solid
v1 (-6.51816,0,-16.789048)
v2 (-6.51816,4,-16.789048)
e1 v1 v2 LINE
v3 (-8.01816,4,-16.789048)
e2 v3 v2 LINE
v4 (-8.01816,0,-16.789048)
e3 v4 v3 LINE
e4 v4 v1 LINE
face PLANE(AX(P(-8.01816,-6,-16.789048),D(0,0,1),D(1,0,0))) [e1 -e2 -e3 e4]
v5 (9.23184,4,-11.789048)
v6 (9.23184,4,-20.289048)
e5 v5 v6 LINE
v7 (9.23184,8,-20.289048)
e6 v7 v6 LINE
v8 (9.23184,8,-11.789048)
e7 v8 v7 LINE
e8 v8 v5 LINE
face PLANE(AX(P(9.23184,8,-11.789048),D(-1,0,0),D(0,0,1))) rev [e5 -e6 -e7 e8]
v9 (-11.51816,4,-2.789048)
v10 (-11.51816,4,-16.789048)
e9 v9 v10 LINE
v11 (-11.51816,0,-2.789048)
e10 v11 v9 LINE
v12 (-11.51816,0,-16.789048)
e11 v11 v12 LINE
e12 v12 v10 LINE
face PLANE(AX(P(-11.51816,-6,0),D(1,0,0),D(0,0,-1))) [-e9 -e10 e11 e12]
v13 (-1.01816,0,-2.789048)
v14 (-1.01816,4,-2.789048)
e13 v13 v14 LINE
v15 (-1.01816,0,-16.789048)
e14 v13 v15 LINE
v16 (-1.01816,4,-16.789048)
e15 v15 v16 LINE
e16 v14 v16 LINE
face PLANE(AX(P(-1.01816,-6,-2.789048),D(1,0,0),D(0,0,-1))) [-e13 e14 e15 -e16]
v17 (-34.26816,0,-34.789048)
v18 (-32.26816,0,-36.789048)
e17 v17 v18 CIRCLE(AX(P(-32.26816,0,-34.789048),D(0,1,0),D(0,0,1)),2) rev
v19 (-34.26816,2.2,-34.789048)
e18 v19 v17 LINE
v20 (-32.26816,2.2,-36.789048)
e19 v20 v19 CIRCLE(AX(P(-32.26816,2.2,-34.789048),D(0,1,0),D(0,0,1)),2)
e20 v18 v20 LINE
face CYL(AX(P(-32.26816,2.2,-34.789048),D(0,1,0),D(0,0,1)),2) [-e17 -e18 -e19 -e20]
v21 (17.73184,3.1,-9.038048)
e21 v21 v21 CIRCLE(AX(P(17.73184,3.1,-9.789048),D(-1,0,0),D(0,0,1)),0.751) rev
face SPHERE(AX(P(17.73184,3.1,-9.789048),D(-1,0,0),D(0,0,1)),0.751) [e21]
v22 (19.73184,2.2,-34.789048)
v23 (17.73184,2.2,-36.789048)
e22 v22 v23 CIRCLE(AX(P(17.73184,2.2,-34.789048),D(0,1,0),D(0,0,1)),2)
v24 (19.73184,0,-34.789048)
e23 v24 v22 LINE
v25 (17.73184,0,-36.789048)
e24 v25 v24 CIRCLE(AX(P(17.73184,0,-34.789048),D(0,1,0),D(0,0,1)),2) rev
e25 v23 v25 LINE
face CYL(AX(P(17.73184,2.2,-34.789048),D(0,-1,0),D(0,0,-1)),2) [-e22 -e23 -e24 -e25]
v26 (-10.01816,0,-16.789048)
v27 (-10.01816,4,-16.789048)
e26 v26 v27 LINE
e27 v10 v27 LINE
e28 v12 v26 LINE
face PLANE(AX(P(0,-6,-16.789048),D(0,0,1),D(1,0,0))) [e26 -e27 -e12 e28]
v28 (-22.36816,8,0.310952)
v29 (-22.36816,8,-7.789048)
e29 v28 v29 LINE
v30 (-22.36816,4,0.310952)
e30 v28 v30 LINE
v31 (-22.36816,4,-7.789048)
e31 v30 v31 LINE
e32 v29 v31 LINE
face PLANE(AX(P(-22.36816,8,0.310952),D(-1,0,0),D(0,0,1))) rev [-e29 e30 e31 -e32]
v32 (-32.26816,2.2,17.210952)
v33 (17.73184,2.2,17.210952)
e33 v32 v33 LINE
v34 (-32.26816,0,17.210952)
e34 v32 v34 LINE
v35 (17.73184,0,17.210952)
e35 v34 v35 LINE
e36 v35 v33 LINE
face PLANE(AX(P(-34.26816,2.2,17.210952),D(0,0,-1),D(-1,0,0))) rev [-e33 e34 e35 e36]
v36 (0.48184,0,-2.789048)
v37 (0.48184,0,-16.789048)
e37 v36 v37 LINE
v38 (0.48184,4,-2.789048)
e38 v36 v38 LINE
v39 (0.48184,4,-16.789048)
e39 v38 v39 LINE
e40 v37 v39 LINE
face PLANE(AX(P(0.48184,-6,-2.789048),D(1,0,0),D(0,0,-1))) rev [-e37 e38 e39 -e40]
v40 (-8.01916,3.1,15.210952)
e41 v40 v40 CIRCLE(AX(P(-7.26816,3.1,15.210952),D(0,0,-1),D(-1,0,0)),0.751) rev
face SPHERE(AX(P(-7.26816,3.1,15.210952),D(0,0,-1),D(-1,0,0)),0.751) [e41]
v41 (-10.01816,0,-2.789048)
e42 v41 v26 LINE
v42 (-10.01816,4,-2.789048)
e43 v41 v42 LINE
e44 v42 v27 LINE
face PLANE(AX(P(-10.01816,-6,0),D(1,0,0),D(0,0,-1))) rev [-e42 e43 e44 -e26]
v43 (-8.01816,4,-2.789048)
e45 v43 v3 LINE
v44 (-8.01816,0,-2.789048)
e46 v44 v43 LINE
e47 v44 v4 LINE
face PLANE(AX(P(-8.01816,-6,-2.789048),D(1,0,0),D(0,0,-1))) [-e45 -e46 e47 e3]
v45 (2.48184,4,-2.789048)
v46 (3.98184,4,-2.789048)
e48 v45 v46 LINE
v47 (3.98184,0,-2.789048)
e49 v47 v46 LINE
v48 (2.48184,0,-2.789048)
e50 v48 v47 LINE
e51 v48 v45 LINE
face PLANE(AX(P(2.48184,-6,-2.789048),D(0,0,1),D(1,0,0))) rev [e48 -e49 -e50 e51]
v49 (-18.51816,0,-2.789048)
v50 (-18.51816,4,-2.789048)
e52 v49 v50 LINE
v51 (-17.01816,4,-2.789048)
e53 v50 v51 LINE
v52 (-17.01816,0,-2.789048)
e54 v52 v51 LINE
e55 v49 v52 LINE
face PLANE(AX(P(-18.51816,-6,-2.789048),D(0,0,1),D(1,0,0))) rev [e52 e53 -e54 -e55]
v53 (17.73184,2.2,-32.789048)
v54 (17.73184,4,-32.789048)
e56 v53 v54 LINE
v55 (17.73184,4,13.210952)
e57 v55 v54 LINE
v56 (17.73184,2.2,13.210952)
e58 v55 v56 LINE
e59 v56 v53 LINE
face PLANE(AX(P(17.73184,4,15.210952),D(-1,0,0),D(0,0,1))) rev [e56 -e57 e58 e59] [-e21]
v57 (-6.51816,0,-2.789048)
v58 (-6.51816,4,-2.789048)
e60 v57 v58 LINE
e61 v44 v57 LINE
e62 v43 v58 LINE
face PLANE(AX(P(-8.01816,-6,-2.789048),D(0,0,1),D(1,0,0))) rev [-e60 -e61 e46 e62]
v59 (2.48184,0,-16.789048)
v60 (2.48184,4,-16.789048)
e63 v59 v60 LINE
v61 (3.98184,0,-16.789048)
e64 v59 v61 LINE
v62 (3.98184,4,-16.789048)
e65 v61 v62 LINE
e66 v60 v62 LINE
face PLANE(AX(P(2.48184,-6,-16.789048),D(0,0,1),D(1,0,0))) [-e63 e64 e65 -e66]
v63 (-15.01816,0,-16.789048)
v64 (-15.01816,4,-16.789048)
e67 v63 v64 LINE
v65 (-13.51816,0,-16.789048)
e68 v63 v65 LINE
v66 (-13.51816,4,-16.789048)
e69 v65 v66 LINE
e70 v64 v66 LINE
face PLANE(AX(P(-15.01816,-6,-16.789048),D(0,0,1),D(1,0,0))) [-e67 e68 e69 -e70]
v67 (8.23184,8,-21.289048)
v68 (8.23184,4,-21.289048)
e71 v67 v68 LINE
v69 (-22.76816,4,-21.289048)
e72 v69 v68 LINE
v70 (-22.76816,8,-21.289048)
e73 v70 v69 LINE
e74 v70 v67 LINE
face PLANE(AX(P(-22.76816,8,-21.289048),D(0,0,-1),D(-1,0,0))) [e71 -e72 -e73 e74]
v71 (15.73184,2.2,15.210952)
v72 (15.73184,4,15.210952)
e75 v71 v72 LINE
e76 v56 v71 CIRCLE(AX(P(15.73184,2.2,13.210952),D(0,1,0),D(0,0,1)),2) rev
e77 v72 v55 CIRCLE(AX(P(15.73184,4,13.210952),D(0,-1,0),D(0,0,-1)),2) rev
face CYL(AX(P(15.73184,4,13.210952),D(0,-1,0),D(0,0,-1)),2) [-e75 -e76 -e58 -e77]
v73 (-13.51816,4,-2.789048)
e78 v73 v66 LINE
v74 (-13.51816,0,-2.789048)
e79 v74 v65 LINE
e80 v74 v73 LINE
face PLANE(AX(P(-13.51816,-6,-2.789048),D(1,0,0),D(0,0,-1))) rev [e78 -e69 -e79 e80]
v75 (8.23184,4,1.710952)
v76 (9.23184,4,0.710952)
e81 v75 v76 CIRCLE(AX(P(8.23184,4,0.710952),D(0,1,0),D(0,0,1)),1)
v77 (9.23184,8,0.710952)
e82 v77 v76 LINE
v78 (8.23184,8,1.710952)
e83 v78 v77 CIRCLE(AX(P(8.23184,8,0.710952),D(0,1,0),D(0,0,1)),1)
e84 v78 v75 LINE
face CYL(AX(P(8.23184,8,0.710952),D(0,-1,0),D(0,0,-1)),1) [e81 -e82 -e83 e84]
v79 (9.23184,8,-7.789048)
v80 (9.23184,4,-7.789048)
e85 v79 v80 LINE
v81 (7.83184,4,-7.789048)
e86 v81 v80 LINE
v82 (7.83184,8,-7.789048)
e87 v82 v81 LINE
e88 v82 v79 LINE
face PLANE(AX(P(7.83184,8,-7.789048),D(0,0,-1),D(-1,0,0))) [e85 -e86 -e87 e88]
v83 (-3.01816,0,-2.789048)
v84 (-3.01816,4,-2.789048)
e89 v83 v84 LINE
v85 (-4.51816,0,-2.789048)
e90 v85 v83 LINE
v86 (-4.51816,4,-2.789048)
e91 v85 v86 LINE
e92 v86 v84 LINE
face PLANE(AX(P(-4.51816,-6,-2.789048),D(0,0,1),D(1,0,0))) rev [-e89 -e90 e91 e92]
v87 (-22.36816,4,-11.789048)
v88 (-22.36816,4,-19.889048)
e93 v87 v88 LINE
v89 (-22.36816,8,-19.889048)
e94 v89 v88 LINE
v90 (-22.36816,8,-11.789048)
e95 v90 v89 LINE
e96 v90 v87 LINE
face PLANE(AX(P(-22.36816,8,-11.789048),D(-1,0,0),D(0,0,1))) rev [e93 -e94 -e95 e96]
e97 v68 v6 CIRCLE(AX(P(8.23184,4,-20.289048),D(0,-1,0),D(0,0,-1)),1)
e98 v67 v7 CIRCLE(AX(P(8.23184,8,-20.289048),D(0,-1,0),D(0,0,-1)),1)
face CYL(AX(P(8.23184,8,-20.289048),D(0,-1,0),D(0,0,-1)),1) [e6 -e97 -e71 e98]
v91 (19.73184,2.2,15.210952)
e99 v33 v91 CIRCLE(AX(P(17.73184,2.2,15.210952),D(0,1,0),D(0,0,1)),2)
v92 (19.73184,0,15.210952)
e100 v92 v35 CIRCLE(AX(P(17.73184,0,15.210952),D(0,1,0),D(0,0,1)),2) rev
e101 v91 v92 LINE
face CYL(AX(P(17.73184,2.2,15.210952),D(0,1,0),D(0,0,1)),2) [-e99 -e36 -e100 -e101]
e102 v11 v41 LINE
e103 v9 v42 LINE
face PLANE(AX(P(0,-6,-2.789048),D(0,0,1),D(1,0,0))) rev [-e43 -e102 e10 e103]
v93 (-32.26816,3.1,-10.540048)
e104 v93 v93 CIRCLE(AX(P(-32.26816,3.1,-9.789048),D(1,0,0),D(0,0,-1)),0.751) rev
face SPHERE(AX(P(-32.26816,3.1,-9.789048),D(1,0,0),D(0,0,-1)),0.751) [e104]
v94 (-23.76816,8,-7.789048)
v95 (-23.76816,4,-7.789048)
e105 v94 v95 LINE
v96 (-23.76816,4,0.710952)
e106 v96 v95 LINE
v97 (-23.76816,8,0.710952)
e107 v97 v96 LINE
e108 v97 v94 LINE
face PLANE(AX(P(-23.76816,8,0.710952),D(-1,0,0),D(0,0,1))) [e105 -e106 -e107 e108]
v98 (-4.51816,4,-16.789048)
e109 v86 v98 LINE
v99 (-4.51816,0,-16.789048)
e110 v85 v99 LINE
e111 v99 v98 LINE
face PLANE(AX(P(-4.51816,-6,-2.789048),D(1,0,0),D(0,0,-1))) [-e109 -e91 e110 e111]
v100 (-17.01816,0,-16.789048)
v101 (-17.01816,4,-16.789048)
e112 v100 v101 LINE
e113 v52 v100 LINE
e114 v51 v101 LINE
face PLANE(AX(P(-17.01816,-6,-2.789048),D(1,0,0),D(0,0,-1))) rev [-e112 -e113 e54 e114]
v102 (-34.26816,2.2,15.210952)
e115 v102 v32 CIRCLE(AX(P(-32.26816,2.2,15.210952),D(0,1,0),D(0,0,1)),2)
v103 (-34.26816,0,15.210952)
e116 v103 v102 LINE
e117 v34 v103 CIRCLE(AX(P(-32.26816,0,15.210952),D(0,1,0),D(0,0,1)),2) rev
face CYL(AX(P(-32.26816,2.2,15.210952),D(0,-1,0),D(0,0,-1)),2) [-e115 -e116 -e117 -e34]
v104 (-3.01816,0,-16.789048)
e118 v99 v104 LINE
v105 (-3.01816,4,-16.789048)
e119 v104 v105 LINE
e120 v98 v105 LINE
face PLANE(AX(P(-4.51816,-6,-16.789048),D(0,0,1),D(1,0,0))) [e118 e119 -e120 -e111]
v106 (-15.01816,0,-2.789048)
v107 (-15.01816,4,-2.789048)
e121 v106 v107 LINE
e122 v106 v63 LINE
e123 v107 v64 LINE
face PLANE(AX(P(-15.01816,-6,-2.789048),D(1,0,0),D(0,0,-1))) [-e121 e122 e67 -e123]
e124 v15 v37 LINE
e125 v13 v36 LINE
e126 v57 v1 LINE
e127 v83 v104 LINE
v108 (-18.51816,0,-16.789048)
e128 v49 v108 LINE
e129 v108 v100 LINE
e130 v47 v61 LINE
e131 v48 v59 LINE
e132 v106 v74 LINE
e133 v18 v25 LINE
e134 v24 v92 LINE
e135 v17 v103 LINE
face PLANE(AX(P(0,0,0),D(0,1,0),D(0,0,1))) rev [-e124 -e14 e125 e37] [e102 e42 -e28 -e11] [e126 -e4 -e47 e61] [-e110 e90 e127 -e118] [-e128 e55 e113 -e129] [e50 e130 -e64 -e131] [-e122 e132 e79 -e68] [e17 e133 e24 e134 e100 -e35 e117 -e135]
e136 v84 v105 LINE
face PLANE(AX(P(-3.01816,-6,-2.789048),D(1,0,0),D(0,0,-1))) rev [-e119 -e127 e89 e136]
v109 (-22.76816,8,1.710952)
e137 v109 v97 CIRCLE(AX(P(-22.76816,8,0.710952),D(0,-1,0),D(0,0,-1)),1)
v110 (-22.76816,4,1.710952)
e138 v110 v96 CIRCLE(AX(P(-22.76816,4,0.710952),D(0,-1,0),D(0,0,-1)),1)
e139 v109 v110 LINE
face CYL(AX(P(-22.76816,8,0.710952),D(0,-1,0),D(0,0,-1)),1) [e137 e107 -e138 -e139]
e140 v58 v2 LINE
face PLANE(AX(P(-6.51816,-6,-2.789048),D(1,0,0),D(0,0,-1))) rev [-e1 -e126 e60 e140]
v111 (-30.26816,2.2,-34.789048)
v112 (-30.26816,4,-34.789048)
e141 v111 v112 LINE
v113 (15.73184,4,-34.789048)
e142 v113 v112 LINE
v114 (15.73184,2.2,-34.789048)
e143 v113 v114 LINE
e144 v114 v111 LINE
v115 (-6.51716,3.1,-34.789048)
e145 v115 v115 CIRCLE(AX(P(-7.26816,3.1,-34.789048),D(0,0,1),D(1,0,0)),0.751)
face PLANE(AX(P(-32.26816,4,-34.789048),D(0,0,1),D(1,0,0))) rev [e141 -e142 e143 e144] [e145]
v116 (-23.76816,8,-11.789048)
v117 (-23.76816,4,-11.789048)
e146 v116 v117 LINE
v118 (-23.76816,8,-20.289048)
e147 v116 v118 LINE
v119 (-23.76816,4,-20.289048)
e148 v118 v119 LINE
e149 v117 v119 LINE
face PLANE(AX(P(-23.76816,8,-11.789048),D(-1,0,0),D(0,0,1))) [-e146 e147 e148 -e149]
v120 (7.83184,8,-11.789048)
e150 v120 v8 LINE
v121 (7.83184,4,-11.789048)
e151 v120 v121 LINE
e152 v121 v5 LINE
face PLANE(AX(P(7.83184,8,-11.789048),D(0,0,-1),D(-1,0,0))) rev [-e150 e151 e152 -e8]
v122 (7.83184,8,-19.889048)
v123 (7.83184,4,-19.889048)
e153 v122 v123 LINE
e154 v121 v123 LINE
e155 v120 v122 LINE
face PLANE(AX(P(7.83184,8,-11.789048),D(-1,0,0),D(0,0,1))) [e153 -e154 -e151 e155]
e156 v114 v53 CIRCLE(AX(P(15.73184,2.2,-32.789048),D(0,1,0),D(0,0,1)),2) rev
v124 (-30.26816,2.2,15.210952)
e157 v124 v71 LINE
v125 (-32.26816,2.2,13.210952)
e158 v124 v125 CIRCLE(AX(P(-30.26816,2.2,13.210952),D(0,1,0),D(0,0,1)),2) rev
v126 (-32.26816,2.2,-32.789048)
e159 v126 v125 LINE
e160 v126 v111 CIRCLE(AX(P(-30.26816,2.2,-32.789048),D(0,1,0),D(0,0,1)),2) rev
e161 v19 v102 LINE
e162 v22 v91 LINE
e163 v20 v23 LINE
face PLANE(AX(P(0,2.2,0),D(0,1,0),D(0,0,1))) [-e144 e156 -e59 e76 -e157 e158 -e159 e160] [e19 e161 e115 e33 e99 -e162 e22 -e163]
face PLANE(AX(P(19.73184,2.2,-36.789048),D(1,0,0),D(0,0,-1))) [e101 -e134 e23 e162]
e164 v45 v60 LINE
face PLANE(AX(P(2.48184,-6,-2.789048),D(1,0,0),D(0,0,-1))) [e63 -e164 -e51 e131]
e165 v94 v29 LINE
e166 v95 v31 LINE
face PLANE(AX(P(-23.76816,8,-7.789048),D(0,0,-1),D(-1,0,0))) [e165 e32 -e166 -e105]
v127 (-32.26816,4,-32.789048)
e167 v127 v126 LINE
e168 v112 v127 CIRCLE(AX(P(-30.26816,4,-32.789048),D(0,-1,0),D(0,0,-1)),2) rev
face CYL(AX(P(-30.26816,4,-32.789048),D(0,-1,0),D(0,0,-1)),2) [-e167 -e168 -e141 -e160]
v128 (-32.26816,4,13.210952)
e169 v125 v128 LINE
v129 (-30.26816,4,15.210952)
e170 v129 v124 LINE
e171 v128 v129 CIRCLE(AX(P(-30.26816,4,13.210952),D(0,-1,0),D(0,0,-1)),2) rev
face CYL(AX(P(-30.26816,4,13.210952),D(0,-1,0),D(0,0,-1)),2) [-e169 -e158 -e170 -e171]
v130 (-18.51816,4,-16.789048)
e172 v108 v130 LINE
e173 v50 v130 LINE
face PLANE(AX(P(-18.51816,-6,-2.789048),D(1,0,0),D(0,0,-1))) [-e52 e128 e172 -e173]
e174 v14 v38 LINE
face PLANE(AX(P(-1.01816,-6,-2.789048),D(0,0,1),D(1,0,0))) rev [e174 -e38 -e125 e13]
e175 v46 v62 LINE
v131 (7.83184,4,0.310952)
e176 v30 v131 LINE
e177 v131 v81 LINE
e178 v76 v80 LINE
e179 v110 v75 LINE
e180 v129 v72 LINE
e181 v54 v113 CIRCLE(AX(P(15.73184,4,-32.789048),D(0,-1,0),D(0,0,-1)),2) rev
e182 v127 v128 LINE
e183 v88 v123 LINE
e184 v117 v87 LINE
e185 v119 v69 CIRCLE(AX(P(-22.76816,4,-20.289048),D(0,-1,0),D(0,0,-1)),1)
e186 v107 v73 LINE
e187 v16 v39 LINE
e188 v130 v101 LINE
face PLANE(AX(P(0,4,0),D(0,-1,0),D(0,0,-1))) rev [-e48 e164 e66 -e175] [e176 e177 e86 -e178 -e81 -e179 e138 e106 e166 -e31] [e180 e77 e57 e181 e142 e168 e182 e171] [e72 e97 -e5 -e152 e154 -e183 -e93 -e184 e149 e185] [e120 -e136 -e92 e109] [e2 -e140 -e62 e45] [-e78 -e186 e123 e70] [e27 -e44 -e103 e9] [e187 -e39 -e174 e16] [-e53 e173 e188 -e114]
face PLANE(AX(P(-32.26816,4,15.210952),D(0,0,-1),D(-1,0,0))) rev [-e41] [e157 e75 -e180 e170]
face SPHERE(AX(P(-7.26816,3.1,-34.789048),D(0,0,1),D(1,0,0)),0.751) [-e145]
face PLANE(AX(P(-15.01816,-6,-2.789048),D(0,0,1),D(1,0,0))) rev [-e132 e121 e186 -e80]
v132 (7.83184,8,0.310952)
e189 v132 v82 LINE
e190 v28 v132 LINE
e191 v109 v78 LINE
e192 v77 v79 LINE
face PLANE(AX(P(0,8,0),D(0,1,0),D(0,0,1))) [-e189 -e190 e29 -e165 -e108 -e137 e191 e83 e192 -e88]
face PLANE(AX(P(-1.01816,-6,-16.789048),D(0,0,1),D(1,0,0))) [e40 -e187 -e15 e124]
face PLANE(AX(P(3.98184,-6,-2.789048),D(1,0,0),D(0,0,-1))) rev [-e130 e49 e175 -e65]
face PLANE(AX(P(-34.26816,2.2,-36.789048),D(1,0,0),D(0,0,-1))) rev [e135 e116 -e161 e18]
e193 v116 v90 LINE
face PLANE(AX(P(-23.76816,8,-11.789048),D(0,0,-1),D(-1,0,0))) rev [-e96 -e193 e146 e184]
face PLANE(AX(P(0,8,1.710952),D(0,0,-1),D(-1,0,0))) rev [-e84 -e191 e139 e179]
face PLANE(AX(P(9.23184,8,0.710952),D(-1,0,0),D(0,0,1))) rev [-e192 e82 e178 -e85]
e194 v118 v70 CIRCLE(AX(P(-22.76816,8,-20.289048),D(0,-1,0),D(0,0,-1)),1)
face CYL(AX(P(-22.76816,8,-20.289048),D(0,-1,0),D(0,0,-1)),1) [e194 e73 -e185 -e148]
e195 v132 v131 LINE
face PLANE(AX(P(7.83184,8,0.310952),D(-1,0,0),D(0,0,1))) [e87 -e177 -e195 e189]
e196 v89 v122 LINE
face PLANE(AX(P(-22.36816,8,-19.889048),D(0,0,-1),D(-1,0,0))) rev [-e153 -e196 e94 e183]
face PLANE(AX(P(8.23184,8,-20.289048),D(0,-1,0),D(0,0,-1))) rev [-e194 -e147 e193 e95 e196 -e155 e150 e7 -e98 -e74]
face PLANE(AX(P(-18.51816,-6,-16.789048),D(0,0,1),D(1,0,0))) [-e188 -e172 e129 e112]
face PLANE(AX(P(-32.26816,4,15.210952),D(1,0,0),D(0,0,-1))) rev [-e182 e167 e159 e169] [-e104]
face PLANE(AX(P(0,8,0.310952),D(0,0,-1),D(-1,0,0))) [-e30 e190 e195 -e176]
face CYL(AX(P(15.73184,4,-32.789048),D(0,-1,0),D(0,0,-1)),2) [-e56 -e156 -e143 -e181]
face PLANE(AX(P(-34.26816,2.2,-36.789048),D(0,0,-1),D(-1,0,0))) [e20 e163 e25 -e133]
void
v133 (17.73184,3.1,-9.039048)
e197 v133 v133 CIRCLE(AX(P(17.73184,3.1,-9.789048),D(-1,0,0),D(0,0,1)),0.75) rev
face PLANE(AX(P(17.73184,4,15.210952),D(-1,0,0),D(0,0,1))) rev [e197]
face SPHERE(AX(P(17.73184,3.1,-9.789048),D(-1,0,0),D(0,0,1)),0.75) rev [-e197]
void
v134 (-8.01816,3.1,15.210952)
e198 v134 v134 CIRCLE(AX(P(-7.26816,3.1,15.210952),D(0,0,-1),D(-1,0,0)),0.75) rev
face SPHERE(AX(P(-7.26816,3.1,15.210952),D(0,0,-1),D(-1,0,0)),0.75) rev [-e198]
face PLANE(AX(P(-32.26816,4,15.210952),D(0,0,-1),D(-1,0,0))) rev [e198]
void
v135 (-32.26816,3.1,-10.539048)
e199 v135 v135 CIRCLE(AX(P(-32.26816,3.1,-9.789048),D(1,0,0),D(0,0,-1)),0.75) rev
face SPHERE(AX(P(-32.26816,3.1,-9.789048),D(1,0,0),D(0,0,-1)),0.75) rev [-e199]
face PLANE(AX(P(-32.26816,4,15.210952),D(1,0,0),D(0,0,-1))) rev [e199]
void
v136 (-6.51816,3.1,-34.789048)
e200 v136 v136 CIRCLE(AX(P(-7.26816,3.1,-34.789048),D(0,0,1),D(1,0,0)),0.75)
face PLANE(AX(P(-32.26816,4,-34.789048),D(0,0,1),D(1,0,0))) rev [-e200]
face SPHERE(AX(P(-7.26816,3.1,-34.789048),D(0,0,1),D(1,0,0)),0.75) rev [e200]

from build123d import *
from build123d.topology import SkipClean

# Parameters (mm, degrees)
SKETCH_1_W          = 54
SKETCH_1_H          = 54
EXTRUDE_2_DEPTH     = 2.2
SKETCH_7_W          = 50
SKETCH_7_H          = 50
EXTRUDE_3_DEPTH     = 1.8
EXTRUDE_5_DEPTH     = 4
SKETCH_9_8_W        = 1.5
SKETCH_9_8_H        = 7
SKETCH_9_8_H_2      = 14
CUT_EXTRUDE_2_DEPTH = 10
FILLET_1_R          = 2
SKETCH_15_W         = 0.001
SKETCH_15_H         = 1.8
REVOLVE_8_ANGLE     = 332


with BuildPart() as part:
    # 草图1 → 凸台-拉伸2 (new body)
    with BuildSketch(Plane(origin=(0, 0, 0), x_dir=(1, 0, 0), z_dir=(0, 1, 0))):
        with Locations((-7.2681601, 9.789048154)):
            Rectangle(SKETCH_1_W, SKETCH_1_H)
    extrude(amount=EXTRUDE_2_DEPTH)

    # 草图7 → 凸台-拉伸3 (add)
    with BuildSketch(Plane(origin=(0, 2.2, 0), x_dir=(1, 0, 0), z_dir=(0, 1, 0))):
        with Locations((-7.2681601, 9.789048154)):
            Rectangle(SKETCH_7_W, SKETCH_7_H)
    extrude(amount=EXTRUDE_3_DEPTH)

    # 草图9 → 凸台-拉伸5 (add)
    with BuildSketch(Plane(origin=(0, 4, 0), x_dir=(1, 0, 0), z_dir=(0, 1, 0))):
        with BuildLine():
            Line((-22.7681601, -1.710951846), (8.2318399, -1.710951846))
            ThreePointArc((8.2318399, -1.710951846), (8.938946681, -1.418058627), (9.2318399, -0.710951846))
            Line((9.2318399, -0.710951846), (9.2318399, 7.789048154))
            Line((9.2318399, 7.789048154), (7.8318399, 7.789048154))
            Line((7.8318399, 7.789048154), (7.8318399, -0.310951846))
            Line((7.8318399, -0.310951846), (-22.3681601, -0.310951846))
            Line((-22.3681601, -0.310951846), (-22.3681601, 7.789048154))
            Line((-22.3681601, 7.789048154), (-23.7681601, 7.789048154))
            Line((-23.7681601, 7.789048154), (-23.7681601, -0.710951846))
            ThreePointArc((-23.7681601, -0.710951846), (-23.475266881, -1.418058627), (-22.7681601, -1.710951846))
        make_face()
        with BuildLine():
            Line((-22.7681601, 21.289048154), (8.2318399, 21.289048154))
            ThreePointArc((8.2318399, 21.289048154), (8.938946681, 20.996154935), (9.2318399, 20.289048154))
            Line((9.2318399, 20.289048154), (9.2318399, 11.789048154))
            Line((9.2318399, 11.789048154), (7.8318399, 11.789048154))
            Line((7.8318399, 11.789048154), (7.8318399, 19.889048154))
            Line((7.8318399, 19.889048154), (-22.3681601, 19.889048154))
            Line((-22.3681601, 19.889048154), (-22.3681601, 11.789048154))
            Line((-22.3681601, 11.789048154), (-23.7681601, 11.789048154))
            Line((-23.7681601, 11.789048154), (-23.7681601, 20.289048154))
            ThreePointArc((-23.7681601, 20.289048154), (-23.475266881, 20.996154935), (-22.7681601, 21.289048154))
        make_face()
    extrude(amount=EXTRUDE_5_DEPTH)

    # 草图9<8> → 切除-拉伸2 (cut)
    with BuildSketch(Plane(origin=(0, 4, 0), x_dir=(1, 0, 0), z_dir=(0, 1, 0))):
        with Locations((-10.7681601, 13.289048154)):
            Rectangle(SKETCH_9_8_W, SKETCH_9_8_H)
        with Locations((-10.7681601, 6.289048154)):
            Rectangle(SKETCH_9_8_W, SKETCH_9_8_H)
        with Locations((-7.2681601, 9.789048154)):
            Rectangle(SKETCH_9_8_W, SKETCH_9_8_H_2)
        with Locations((-14.2681601, 9.789048154)):
            Rectangle(SKETCH_9_8_W, SKETCH_9_8_H_2)
        with Locations((-17.7681601, 9.789048154)):
            Rectangle(SKETCH_9_8_W, SKETCH_9_8_H_2)
        with Locations((-3.7681601, 9.789048154)):
            Rectangle(SKETCH_9_8_W, SKETCH_9_8_H_2)
        with Locations((-0.2681601, 9.789048154)):
            Rectangle(SKETCH_9_8_W, SKETCH_9_8_H_2)
        with Locations((3.2318399, 9.789048154)):
            Rectangle(SKETCH_9_8_W, SKETCH_9_8_H_2)
    extrude(amount=-CUT_EXTRUDE_2_DEPTH, mode=Mode.SUBTRACT)

    # 圆角1
    fillet_1_edges = [part.edges().sort_by_distance(p)[0] for p in [
        (17.7318399, 3.1, 15.210951846),
        (17.7318399, 3.1, -34.789048154),
        (-32.2681601, 3.1, -34.789048154),
        (-32.2681601, 3.1, 15.210951846),
        (-34.2681601, 1.1, -36.789048154),
        (19.7318399, 1.1, -36.789048154),
        (19.7318399, 1.1, 17.210951846),
        (-34.2681601, 1.1, 17.210951846),
    ]]
    fillet(fillet_1_edges, radius=FILLET_1_R)

    # 草图12 → 旋转-薄壁5 (revolve)
    with BuildSketch(Plane.XY.offset(15.210951846)):
        with BuildLine():
            ThreePointArc((-7.2681601, 2.35), (-6.5181601, 3.1), (-7.2681601, 3.85))
            Line((-7.2681601, 3.85), (-7.2681601, 3.851))
            ThreePointArc((-7.2681601, 3.851), (-6.5171601, 3.1), (-7.2681601, 2.349))
            Line((-7.2681601, 2.349), (-7.2681601, 2.35))
        make_face()
    revolve(axis=Axis((-7.2681601, 4, 15.210951846), (0, -1, 0)))

    # 草图13 → 旋转-薄壁6 (revolve)
    with BuildSketch(Plane.ZY.offset(32.2681601)):
        with BuildLine():
            ThreePointArc((-9.789048154, 2.35), (-9.039048154, 3.1), (-9.789048154, 3.85))
            Line((-9.789048154, 3.85), (-9.789048154, 3.851))
            ThreePointArc((-9.789048154, 3.851), (-9.038048154, 3.1), (-9.789048154, 2.349))
            Line((-9.789048154, 2.349), (-9.789048154, 2.35))
        make_face()
    revolve(axis=Axis((-32.2681601, 4, -9.789048154), (0, -1, 0)))

    # 草图15 → 旋转-薄壁8 (revolve)
    with SkipClean():  # the faces are left unmerged after this step: merging them gives an invalid solid
        with BuildSketch(Plane(origin=(17.7318399, 0, 0), x_dir=(0, 0, -1), z_dir=(1, 0, 0))):
            with Locations((9.788548154, 3.1)):
                Rectangle(SKETCH_15_W, SKETCH_15_H)
            with BuildLine():
                ThreePointArc((9.789048154, 2.35), (10.539048154, 3.1), (9.789048154, 3.85))
                Line((9.789048154, 3.85), (9.789048154, 3.851))
                ThreePointArc((9.789048154, 3.851), (10.540048154, 3.1), (9.789048154, 2.349))
                Line((9.789048154, 2.349), (9.789048154, 2.35))
            make_face()
        revolve(axis=Axis((17.7318399, 4, -9.789048154), (0, -1, 0)), revolution_arc=REVOLVE_8_ANGLE)
    add(part.part.scale(1), mode=Mode.REPLACE)  # the faces are merged on a copy

    # 草图16 → 旋转-薄壁9 (revolve)
    with BuildSketch(Plane(origin=(0, 0, -34.789048154), x_dir=(-1, 0, 0), z_dir=(0, 0, -1))):
        with BuildLine():
            ThreePointArc((7.2681601, 3.85), (6.5181601, 3.1), (7.2681601, 2.35))
            Line((7.2681601, 2.35), (7.2681601, 2.349))
            ThreePointArc((7.2681601, 2.349), (6.5171601, 3.1), (7.2681601, 3.851))
            Line((7.2681601, 3.851), (7.2681601, 3.85))
        make_face()
    revolve(axis=Axis((-7.2681601, 4, -34.789048154), (0, -1, 0)))


solid = part.part
